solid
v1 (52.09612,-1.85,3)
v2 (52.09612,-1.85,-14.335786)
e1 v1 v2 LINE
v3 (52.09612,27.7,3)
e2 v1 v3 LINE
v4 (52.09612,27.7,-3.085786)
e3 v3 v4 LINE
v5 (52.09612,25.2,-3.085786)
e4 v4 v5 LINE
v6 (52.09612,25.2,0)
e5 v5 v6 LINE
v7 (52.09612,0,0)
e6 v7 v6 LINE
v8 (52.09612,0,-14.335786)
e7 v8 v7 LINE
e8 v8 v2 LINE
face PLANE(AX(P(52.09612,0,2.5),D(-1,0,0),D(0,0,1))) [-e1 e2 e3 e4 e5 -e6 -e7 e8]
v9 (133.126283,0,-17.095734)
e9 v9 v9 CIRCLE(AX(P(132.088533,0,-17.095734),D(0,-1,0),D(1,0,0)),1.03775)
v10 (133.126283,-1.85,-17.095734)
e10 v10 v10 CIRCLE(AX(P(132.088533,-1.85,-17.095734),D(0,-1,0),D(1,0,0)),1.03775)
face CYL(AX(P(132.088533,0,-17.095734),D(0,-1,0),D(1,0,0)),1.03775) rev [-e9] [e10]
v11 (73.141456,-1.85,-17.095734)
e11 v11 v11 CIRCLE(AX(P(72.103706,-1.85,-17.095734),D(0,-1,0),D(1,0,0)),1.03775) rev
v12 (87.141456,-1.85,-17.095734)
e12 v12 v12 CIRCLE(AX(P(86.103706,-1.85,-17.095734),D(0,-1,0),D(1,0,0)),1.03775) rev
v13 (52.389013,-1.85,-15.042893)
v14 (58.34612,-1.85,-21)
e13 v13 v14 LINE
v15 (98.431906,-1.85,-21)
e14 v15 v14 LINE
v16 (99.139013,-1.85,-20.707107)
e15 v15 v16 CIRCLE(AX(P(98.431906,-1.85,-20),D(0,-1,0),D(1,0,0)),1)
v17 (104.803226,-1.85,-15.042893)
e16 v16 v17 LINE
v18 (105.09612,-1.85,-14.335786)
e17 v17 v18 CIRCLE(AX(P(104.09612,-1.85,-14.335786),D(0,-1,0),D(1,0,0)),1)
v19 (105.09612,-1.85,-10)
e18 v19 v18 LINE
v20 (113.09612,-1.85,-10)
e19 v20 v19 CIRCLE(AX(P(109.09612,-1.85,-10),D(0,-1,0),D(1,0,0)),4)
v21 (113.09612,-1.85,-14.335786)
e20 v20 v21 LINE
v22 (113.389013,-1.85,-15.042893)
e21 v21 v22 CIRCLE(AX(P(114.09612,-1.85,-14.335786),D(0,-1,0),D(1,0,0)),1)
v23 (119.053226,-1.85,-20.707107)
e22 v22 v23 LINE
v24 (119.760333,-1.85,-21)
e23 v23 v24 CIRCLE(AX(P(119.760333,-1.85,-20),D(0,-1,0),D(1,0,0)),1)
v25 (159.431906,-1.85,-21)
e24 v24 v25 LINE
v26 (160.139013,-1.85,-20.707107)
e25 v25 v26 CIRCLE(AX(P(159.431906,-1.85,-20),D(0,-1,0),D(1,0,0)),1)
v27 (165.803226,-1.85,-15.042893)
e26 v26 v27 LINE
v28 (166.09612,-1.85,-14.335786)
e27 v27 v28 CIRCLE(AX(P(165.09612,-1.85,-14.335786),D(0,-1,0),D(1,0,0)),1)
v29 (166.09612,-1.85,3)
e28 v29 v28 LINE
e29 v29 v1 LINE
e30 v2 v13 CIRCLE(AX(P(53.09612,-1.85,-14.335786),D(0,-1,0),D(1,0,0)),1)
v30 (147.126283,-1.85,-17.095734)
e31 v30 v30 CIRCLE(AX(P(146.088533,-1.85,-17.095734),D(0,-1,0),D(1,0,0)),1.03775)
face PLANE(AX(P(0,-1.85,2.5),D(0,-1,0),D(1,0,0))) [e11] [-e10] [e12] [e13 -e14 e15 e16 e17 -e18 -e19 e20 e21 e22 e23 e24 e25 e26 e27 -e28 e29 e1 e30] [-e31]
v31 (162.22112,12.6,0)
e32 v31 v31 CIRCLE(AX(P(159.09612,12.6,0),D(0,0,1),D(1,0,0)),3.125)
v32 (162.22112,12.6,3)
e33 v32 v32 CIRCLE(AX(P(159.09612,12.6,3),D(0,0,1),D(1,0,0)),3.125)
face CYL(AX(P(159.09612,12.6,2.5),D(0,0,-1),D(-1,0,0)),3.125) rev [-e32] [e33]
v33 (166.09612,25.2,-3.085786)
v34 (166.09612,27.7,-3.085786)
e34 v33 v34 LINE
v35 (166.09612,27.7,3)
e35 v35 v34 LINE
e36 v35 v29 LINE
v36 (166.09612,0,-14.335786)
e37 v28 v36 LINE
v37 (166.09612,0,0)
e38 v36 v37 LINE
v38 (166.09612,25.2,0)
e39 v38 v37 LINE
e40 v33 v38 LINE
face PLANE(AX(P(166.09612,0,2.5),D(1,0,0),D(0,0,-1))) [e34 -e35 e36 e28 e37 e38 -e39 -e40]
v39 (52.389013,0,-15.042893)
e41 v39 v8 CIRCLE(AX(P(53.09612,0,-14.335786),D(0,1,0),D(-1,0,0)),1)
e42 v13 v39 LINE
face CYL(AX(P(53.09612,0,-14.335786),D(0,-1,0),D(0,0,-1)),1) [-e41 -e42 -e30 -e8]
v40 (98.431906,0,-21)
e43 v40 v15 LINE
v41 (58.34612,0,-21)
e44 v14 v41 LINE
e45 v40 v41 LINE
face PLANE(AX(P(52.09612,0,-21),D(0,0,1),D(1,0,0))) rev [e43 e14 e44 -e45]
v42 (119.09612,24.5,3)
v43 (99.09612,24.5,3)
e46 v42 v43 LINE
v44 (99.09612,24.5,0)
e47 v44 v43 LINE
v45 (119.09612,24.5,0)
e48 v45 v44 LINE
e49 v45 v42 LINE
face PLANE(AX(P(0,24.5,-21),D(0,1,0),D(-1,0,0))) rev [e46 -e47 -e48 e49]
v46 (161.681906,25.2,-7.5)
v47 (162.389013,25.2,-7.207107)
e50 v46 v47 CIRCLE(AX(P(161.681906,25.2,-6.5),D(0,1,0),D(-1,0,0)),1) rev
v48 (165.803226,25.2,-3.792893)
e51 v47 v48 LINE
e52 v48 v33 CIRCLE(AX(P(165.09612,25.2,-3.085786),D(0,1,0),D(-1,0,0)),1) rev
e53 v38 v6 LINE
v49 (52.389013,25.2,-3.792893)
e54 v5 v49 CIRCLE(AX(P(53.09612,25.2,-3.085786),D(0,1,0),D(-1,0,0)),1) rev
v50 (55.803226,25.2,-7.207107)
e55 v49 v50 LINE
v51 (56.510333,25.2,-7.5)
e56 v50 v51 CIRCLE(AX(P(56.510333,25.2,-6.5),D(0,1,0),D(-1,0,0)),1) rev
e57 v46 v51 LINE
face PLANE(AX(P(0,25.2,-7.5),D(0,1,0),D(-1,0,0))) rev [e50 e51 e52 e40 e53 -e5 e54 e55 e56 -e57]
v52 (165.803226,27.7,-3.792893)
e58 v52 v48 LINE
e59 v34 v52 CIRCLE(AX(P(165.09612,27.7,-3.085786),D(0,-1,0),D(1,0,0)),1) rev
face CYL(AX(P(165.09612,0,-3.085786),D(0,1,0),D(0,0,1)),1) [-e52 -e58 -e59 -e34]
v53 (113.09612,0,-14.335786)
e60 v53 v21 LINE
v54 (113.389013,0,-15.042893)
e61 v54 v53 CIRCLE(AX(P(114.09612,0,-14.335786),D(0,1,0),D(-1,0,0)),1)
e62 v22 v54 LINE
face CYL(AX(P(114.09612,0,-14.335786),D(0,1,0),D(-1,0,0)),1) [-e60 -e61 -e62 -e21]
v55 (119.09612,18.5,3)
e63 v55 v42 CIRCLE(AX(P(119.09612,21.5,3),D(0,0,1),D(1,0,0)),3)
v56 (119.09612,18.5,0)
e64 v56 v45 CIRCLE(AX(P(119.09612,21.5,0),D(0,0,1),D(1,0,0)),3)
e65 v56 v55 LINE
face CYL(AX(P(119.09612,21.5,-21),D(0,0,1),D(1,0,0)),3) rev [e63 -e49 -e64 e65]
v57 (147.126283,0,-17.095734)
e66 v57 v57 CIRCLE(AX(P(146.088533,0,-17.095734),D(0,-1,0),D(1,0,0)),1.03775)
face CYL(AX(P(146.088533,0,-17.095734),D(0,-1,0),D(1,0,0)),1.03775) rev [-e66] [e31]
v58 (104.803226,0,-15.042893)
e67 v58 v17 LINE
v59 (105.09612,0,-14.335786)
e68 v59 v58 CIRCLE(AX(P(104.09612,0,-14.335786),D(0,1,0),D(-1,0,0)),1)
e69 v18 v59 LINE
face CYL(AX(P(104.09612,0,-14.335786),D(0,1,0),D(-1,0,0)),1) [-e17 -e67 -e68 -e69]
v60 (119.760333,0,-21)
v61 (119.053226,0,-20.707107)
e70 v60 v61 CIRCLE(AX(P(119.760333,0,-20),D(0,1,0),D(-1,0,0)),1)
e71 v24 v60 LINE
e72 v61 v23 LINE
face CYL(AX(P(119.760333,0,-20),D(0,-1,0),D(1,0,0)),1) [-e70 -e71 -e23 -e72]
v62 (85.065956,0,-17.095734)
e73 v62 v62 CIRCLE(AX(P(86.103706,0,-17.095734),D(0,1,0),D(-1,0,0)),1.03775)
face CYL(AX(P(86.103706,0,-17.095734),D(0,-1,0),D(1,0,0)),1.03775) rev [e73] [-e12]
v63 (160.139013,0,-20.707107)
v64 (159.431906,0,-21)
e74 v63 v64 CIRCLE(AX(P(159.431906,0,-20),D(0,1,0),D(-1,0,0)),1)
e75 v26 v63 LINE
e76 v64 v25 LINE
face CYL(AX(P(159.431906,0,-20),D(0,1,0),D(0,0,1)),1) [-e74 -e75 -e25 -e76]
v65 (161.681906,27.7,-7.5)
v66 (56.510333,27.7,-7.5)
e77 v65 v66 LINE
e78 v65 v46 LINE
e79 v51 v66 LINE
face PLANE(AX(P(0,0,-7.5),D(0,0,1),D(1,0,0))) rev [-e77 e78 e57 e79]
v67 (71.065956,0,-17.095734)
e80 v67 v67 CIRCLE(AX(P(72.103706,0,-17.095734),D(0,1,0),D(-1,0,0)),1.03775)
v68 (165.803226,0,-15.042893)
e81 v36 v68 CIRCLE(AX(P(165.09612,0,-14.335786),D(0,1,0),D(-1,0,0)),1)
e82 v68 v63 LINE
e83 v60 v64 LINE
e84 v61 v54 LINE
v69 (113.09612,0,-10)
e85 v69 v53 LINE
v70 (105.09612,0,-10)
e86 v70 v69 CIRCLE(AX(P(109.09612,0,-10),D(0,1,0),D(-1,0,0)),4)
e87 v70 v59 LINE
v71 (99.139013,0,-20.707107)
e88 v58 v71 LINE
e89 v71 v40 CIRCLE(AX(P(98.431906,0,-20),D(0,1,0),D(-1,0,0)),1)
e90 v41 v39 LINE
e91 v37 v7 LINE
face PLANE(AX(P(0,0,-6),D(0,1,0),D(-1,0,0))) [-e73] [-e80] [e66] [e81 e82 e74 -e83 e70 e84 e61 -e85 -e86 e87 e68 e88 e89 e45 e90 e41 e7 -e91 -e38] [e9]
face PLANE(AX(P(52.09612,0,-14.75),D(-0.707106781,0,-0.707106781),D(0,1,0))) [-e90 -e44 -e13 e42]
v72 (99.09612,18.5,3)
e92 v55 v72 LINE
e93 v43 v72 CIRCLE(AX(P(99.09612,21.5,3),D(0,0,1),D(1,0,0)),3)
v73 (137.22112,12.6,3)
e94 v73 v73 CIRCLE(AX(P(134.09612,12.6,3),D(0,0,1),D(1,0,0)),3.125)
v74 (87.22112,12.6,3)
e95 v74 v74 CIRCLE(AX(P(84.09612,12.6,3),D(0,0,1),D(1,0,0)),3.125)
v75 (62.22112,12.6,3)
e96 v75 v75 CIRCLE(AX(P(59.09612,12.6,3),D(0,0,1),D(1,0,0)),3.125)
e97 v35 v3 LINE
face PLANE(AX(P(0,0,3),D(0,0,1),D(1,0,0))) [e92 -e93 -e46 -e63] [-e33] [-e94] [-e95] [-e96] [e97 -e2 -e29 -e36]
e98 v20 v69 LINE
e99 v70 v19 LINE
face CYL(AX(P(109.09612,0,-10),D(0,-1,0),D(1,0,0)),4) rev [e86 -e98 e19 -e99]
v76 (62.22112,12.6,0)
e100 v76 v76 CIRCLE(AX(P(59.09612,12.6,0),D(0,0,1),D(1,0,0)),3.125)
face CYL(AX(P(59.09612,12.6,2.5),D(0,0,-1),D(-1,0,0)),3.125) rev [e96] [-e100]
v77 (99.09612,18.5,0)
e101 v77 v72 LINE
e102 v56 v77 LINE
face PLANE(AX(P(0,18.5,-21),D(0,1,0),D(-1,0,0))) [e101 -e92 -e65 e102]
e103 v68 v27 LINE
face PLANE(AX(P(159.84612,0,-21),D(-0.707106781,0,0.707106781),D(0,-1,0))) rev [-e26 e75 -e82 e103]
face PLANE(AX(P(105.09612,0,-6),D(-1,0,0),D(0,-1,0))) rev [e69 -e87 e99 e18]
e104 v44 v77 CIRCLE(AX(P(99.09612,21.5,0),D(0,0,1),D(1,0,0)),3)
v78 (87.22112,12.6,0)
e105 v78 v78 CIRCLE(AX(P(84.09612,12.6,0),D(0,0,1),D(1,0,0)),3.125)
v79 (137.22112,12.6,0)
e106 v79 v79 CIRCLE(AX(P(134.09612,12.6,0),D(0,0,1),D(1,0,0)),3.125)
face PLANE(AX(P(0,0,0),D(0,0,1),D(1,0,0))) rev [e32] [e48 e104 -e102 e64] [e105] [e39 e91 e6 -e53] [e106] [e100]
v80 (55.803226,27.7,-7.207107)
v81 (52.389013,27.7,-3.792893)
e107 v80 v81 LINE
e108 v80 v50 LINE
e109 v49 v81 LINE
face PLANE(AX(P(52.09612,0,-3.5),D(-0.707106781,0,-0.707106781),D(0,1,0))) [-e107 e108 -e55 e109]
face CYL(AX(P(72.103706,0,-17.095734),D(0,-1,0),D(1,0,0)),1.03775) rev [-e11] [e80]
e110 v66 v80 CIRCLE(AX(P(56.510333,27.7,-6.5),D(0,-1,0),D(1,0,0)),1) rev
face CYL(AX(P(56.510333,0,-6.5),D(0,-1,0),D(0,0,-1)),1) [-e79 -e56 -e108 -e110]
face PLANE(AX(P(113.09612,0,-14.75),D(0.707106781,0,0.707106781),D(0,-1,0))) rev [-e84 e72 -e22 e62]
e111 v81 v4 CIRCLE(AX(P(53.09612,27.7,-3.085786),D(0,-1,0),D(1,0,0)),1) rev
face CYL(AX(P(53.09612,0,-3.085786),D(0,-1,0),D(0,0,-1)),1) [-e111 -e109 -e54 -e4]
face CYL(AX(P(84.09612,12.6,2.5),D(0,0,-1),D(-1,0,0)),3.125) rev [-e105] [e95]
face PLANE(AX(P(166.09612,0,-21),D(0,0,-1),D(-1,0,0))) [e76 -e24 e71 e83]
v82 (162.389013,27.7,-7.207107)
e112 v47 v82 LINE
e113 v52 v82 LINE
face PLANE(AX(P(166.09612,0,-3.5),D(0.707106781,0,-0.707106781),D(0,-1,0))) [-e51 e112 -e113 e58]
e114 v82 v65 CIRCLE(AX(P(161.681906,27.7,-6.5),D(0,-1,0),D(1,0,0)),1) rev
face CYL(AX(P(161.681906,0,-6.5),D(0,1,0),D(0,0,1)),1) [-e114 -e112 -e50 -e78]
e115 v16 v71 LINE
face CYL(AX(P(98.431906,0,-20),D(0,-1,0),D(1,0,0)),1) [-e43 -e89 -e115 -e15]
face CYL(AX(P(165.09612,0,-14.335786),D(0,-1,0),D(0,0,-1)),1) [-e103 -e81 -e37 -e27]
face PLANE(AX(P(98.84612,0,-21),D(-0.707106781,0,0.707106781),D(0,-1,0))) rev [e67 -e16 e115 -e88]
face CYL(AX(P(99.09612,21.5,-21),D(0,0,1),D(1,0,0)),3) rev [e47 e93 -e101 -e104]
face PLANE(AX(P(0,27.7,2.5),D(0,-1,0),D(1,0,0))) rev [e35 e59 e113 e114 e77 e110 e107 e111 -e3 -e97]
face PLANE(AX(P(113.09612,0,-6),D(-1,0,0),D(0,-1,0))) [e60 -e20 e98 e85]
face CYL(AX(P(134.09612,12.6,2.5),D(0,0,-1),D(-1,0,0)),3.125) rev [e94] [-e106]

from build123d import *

# Parameters (mm, degrees)
SKETCH1_R            = 3.125
BOSS_EXTRUDE1_DEPTH  = 2.5
BOSS_EXTRUDE2_START  = -2.5
SKETCH2_W            = 114
SKETCH2_H            = 2.5
BOSS_EXTRUDE2_DEPTH  = 6
SKETCH2_6_W          = 114
SKETCH2_6_H          = 2
BOSS_EXTRUDE3_DEPTH  = 10
SKETCH5_W            = 53
SKETCH5_H            = 15
SKETCH5_R            = 1.03775
BOSS_EXTRUDE4_DEPTH  = 2.5
CHAMFER1_SIZE        = 6.25
CHAMFER2_SIZE        = 4
FILLET2_R            = 1
FILLET3_R            = 4
CUT_EXTRUDE2_DEPTH   = 171.104117862
MOVE_START           = 2.5
MOVE_FACE1_OUTLINE_W = 114
MOVE_FACE1_OUTLINE_H = 30.7
MOVE_FACE1_OUTLINE_R = 3.125
MOVE_FACE1_DEPTH     = 0.5
MOVE_FACE2_BY        = 1
MOVE_FACE3_BY        = 0.5
MOVE_FACE4_BY        = 0.65


# Read off the part's stored shape, not the designer's step: Move Face1
with BuildPart() as part:
    # Sketch1 → Boss-Extrude1 (new body)
    with BuildSketch(Plane.XY):
        Polygon((52.096119502, 0), (52.096119502, 25.2), (52.096119502, 28.2), (166.096119502, 28.2), (166.096119502, 25.2), (166.096119502, 0), (166.096119502, -2.5), (52.096119502, -2.5), align=None)
        with Locations((84.096119502, 12.6)):
            Circle(SKETCH1_R, mode=Mode.SUBTRACT)
        with Locations((134.096119502, 12.6)):
            Circle(SKETCH1_R, mode=Mode.SUBTRACT)
        with Locations((59.096119502, 12.6)):
            Circle(SKETCH1_R, mode=Mode.SUBTRACT)
        with Locations((159.096119502, 12.6)):
            Circle(SKETCH1_R, mode=Mode.SUBTRACT)
    extrude(amount=BOSS_EXTRUDE1_DEPTH)

    # Sketch2 → Boss-Extrude2 (add)
    with BuildSketch(Plane.XY.offset(2.5).offset(BOSS_EXTRUDE2_START)):
        with Locations((109.096119502, -1.25)):
            Rectangle(SKETCH2_W, SKETCH2_H)
    extrude(amount=-BOSS_EXTRUDE2_DEPTH)

    # Sketch2<6> → Boss-Extrude3 (add)
    with BuildSketch(Plane.XY.offset(2.5)):
        with Locations((109.096119502, 27.2)):
            Rectangle(SKETCH2_6_W, SKETCH2_6_H)
    extrude(amount=-BOSS_EXTRUDE3_DEPTH)

    # Sketch5 → Boss-Extrude4 (add)
    with BuildSketch(Plane.XZ.offset(2.5)):
        with Locations((139.596119502, -13.5)):
            Rectangle(SKETCH5_W, SKETCH5_H)
        with Locations((146.088533212, -17.095733919)):
            Circle(SKETCH5_R, mode=Mode.SUBTRACT)
        with Locations((132.088533212, -17.095733919)):
            Circle(SKETCH5_R, mode=Mode.SUBTRACT)
    boss_extrude4 = extrude(amount=-BOSS_EXTRUDE4_DEPTH)

    # Mirror1: Boss-Extrude4 across plane
    add(boss_extrude4.mirror(Plane(origin=(109.096119502, 0, 0), x_dir=(0, 0, 1), z_dir=(1, 0, 0))))

    # Chamfer1
    chamfer1_edges = [part.edges().sort_by_distance(p)[0] for p in [
        (166.096119502, -1.25, -21),
        (113.096119502, -1.25, -21),
        (52.096119502, -1.25, -21),
        (105.096119502, -1.25, -21),
    ]]
    chamfer(chamfer1_edges, length=CHAMFER1_SIZE)

    # Chamfer2
    chamfer2_edges = [part.edges().sort_by_distance(p)[0] for p in [
        (52.096119502, 27.2, -7.5),
        (166.096119502, 27.2, -7.5),
    ]]
    chamfer(chamfer2_edges, length=CHAMFER2_SIZE)

    # Fillet2
    fillet2_edges = [part.edges().sort_by_distance(p)[0] for p in [
        (98.846119502, -1.25, -21),
        (105.096119502, -1.25, -14.75),
        (113.096119502, -1.25, -14.75),
        (159.846119502, -1.25, -21),
        (119.346119502, -1.25, -21),
        (166.096119502, -1.25, -14.75),
        (166.096119502, 27.2, -3.5),
        (56.096119502, 27.2, -7.5),
        (162.096119502, 27.2, -7.5),
        (52.096119502, 27.2, -3.5),
        (52.096119502, -1.25, -14.75),
    ]]
    fillet(fillet2_edges, radius=FILLET2_R)

    # Fillet3
    fillet3_edges = [part.edges().sort_by_distance(p)[0] for p in [
        (113.096119502, -1.25, -6),
        (105.096119502, -1.25, -6),
    ]]
    fillet(fillet3_edges, radius=FILLET3_R - 0.0001)  # a hair under: the kernel refuses the full size

    # Sketch6 → Cut-Extrude2 (cut, through all)
    with BuildSketch(Plane.XY.offset(2.5)):
        with BuildLine():
            Line((119.096119502, 24.5), (99.096119502, 24.5))
            ThreePointArc((99.096119502, 24.5), (96.096119502, 21.5), (99.096119502, 18.5))
            Line((99.096119502, 18.5), (119.096119502, 18.5))
            ThreePointArc((119.096119502, 18.5), (122.096119502, 21.5), (119.096119502, 24.5))
        make_face()
    extrude(amount=-CUT_EXTRUDE2_DEPTH, mode=Mode.SUBTRACT)

    # Move Face1 outline → Move Face1 (add)
    with BuildSketch(Plane.XY.offset(MOVE_START)):
        with Locations((109.096119502, 12.85)):
            Rectangle(MOVE_FACE1_OUTLINE_W, MOVE_FACE1_OUTLINE_H)
        with Locations((59.096119502, 12.6)):
            Circle(MOVE_FACE1_OUTLINE_R, mode=Mode.SUBTRACT)
        with Locations((84.096119502, 12.6)):
            Circle(MOVE_FACE1_OUTLINE_R, mode=Mode.SUBTRACT)
        with Locations((134.096119502, 12.6)):
            Circle(MOVE_FACE1_OUTLINE_R, mode=Mode.SUBTRACT)
        with Locations((159.096119502, 12.6)):
            Circle(MOVE_FACE1_OUTLINE_R, mode=Mode.SUBTRACT)
        with BuildLine():
            Line((99.096119502, 24.5), (119.096119502, 24.5))
            ThreePointArc((119.096119502, 24.5), (122.096119502, 21.5), (119.096119502, 18.5))
            Line((119.096119502, 18.5), (99.096119502, 18.5))
            ThreePointArc((99.096119502, 18.5), (96.096119502, 21.5), (99.096119502, 24.5))
        make_face(mode=Mode.SUBTRACT)
    extrude(amount=MOVE_FACE1_DEPTH)

    # Move Face2: a face moved outward by 1.0
    extrude(part.faces().sort_by_distance((109.096119502, 26.2, -3.703733506))[0], amount=MOVE_FACE2_BY, dir=(0, -1, 0))

    # Move Face3: a face moved inward by 0.5
    extrude(part.faces().sort_by_distance((109.096119502, 28.2, -2.196700016))[0], amount=MOVE_FACE3_BY, dir=(0, -1, 0), mode=Mode.SUBTRACT)

    # Move Face4: a face moved inward by 0.65
    extrude(part.faces().sort_by_distance((109.096119502, -2.5, -3))[0], amount=MOVE_FACE4_BY, dir=(0, 1, 0), mode=Mode.SUBTRACT)


solid = part.part
